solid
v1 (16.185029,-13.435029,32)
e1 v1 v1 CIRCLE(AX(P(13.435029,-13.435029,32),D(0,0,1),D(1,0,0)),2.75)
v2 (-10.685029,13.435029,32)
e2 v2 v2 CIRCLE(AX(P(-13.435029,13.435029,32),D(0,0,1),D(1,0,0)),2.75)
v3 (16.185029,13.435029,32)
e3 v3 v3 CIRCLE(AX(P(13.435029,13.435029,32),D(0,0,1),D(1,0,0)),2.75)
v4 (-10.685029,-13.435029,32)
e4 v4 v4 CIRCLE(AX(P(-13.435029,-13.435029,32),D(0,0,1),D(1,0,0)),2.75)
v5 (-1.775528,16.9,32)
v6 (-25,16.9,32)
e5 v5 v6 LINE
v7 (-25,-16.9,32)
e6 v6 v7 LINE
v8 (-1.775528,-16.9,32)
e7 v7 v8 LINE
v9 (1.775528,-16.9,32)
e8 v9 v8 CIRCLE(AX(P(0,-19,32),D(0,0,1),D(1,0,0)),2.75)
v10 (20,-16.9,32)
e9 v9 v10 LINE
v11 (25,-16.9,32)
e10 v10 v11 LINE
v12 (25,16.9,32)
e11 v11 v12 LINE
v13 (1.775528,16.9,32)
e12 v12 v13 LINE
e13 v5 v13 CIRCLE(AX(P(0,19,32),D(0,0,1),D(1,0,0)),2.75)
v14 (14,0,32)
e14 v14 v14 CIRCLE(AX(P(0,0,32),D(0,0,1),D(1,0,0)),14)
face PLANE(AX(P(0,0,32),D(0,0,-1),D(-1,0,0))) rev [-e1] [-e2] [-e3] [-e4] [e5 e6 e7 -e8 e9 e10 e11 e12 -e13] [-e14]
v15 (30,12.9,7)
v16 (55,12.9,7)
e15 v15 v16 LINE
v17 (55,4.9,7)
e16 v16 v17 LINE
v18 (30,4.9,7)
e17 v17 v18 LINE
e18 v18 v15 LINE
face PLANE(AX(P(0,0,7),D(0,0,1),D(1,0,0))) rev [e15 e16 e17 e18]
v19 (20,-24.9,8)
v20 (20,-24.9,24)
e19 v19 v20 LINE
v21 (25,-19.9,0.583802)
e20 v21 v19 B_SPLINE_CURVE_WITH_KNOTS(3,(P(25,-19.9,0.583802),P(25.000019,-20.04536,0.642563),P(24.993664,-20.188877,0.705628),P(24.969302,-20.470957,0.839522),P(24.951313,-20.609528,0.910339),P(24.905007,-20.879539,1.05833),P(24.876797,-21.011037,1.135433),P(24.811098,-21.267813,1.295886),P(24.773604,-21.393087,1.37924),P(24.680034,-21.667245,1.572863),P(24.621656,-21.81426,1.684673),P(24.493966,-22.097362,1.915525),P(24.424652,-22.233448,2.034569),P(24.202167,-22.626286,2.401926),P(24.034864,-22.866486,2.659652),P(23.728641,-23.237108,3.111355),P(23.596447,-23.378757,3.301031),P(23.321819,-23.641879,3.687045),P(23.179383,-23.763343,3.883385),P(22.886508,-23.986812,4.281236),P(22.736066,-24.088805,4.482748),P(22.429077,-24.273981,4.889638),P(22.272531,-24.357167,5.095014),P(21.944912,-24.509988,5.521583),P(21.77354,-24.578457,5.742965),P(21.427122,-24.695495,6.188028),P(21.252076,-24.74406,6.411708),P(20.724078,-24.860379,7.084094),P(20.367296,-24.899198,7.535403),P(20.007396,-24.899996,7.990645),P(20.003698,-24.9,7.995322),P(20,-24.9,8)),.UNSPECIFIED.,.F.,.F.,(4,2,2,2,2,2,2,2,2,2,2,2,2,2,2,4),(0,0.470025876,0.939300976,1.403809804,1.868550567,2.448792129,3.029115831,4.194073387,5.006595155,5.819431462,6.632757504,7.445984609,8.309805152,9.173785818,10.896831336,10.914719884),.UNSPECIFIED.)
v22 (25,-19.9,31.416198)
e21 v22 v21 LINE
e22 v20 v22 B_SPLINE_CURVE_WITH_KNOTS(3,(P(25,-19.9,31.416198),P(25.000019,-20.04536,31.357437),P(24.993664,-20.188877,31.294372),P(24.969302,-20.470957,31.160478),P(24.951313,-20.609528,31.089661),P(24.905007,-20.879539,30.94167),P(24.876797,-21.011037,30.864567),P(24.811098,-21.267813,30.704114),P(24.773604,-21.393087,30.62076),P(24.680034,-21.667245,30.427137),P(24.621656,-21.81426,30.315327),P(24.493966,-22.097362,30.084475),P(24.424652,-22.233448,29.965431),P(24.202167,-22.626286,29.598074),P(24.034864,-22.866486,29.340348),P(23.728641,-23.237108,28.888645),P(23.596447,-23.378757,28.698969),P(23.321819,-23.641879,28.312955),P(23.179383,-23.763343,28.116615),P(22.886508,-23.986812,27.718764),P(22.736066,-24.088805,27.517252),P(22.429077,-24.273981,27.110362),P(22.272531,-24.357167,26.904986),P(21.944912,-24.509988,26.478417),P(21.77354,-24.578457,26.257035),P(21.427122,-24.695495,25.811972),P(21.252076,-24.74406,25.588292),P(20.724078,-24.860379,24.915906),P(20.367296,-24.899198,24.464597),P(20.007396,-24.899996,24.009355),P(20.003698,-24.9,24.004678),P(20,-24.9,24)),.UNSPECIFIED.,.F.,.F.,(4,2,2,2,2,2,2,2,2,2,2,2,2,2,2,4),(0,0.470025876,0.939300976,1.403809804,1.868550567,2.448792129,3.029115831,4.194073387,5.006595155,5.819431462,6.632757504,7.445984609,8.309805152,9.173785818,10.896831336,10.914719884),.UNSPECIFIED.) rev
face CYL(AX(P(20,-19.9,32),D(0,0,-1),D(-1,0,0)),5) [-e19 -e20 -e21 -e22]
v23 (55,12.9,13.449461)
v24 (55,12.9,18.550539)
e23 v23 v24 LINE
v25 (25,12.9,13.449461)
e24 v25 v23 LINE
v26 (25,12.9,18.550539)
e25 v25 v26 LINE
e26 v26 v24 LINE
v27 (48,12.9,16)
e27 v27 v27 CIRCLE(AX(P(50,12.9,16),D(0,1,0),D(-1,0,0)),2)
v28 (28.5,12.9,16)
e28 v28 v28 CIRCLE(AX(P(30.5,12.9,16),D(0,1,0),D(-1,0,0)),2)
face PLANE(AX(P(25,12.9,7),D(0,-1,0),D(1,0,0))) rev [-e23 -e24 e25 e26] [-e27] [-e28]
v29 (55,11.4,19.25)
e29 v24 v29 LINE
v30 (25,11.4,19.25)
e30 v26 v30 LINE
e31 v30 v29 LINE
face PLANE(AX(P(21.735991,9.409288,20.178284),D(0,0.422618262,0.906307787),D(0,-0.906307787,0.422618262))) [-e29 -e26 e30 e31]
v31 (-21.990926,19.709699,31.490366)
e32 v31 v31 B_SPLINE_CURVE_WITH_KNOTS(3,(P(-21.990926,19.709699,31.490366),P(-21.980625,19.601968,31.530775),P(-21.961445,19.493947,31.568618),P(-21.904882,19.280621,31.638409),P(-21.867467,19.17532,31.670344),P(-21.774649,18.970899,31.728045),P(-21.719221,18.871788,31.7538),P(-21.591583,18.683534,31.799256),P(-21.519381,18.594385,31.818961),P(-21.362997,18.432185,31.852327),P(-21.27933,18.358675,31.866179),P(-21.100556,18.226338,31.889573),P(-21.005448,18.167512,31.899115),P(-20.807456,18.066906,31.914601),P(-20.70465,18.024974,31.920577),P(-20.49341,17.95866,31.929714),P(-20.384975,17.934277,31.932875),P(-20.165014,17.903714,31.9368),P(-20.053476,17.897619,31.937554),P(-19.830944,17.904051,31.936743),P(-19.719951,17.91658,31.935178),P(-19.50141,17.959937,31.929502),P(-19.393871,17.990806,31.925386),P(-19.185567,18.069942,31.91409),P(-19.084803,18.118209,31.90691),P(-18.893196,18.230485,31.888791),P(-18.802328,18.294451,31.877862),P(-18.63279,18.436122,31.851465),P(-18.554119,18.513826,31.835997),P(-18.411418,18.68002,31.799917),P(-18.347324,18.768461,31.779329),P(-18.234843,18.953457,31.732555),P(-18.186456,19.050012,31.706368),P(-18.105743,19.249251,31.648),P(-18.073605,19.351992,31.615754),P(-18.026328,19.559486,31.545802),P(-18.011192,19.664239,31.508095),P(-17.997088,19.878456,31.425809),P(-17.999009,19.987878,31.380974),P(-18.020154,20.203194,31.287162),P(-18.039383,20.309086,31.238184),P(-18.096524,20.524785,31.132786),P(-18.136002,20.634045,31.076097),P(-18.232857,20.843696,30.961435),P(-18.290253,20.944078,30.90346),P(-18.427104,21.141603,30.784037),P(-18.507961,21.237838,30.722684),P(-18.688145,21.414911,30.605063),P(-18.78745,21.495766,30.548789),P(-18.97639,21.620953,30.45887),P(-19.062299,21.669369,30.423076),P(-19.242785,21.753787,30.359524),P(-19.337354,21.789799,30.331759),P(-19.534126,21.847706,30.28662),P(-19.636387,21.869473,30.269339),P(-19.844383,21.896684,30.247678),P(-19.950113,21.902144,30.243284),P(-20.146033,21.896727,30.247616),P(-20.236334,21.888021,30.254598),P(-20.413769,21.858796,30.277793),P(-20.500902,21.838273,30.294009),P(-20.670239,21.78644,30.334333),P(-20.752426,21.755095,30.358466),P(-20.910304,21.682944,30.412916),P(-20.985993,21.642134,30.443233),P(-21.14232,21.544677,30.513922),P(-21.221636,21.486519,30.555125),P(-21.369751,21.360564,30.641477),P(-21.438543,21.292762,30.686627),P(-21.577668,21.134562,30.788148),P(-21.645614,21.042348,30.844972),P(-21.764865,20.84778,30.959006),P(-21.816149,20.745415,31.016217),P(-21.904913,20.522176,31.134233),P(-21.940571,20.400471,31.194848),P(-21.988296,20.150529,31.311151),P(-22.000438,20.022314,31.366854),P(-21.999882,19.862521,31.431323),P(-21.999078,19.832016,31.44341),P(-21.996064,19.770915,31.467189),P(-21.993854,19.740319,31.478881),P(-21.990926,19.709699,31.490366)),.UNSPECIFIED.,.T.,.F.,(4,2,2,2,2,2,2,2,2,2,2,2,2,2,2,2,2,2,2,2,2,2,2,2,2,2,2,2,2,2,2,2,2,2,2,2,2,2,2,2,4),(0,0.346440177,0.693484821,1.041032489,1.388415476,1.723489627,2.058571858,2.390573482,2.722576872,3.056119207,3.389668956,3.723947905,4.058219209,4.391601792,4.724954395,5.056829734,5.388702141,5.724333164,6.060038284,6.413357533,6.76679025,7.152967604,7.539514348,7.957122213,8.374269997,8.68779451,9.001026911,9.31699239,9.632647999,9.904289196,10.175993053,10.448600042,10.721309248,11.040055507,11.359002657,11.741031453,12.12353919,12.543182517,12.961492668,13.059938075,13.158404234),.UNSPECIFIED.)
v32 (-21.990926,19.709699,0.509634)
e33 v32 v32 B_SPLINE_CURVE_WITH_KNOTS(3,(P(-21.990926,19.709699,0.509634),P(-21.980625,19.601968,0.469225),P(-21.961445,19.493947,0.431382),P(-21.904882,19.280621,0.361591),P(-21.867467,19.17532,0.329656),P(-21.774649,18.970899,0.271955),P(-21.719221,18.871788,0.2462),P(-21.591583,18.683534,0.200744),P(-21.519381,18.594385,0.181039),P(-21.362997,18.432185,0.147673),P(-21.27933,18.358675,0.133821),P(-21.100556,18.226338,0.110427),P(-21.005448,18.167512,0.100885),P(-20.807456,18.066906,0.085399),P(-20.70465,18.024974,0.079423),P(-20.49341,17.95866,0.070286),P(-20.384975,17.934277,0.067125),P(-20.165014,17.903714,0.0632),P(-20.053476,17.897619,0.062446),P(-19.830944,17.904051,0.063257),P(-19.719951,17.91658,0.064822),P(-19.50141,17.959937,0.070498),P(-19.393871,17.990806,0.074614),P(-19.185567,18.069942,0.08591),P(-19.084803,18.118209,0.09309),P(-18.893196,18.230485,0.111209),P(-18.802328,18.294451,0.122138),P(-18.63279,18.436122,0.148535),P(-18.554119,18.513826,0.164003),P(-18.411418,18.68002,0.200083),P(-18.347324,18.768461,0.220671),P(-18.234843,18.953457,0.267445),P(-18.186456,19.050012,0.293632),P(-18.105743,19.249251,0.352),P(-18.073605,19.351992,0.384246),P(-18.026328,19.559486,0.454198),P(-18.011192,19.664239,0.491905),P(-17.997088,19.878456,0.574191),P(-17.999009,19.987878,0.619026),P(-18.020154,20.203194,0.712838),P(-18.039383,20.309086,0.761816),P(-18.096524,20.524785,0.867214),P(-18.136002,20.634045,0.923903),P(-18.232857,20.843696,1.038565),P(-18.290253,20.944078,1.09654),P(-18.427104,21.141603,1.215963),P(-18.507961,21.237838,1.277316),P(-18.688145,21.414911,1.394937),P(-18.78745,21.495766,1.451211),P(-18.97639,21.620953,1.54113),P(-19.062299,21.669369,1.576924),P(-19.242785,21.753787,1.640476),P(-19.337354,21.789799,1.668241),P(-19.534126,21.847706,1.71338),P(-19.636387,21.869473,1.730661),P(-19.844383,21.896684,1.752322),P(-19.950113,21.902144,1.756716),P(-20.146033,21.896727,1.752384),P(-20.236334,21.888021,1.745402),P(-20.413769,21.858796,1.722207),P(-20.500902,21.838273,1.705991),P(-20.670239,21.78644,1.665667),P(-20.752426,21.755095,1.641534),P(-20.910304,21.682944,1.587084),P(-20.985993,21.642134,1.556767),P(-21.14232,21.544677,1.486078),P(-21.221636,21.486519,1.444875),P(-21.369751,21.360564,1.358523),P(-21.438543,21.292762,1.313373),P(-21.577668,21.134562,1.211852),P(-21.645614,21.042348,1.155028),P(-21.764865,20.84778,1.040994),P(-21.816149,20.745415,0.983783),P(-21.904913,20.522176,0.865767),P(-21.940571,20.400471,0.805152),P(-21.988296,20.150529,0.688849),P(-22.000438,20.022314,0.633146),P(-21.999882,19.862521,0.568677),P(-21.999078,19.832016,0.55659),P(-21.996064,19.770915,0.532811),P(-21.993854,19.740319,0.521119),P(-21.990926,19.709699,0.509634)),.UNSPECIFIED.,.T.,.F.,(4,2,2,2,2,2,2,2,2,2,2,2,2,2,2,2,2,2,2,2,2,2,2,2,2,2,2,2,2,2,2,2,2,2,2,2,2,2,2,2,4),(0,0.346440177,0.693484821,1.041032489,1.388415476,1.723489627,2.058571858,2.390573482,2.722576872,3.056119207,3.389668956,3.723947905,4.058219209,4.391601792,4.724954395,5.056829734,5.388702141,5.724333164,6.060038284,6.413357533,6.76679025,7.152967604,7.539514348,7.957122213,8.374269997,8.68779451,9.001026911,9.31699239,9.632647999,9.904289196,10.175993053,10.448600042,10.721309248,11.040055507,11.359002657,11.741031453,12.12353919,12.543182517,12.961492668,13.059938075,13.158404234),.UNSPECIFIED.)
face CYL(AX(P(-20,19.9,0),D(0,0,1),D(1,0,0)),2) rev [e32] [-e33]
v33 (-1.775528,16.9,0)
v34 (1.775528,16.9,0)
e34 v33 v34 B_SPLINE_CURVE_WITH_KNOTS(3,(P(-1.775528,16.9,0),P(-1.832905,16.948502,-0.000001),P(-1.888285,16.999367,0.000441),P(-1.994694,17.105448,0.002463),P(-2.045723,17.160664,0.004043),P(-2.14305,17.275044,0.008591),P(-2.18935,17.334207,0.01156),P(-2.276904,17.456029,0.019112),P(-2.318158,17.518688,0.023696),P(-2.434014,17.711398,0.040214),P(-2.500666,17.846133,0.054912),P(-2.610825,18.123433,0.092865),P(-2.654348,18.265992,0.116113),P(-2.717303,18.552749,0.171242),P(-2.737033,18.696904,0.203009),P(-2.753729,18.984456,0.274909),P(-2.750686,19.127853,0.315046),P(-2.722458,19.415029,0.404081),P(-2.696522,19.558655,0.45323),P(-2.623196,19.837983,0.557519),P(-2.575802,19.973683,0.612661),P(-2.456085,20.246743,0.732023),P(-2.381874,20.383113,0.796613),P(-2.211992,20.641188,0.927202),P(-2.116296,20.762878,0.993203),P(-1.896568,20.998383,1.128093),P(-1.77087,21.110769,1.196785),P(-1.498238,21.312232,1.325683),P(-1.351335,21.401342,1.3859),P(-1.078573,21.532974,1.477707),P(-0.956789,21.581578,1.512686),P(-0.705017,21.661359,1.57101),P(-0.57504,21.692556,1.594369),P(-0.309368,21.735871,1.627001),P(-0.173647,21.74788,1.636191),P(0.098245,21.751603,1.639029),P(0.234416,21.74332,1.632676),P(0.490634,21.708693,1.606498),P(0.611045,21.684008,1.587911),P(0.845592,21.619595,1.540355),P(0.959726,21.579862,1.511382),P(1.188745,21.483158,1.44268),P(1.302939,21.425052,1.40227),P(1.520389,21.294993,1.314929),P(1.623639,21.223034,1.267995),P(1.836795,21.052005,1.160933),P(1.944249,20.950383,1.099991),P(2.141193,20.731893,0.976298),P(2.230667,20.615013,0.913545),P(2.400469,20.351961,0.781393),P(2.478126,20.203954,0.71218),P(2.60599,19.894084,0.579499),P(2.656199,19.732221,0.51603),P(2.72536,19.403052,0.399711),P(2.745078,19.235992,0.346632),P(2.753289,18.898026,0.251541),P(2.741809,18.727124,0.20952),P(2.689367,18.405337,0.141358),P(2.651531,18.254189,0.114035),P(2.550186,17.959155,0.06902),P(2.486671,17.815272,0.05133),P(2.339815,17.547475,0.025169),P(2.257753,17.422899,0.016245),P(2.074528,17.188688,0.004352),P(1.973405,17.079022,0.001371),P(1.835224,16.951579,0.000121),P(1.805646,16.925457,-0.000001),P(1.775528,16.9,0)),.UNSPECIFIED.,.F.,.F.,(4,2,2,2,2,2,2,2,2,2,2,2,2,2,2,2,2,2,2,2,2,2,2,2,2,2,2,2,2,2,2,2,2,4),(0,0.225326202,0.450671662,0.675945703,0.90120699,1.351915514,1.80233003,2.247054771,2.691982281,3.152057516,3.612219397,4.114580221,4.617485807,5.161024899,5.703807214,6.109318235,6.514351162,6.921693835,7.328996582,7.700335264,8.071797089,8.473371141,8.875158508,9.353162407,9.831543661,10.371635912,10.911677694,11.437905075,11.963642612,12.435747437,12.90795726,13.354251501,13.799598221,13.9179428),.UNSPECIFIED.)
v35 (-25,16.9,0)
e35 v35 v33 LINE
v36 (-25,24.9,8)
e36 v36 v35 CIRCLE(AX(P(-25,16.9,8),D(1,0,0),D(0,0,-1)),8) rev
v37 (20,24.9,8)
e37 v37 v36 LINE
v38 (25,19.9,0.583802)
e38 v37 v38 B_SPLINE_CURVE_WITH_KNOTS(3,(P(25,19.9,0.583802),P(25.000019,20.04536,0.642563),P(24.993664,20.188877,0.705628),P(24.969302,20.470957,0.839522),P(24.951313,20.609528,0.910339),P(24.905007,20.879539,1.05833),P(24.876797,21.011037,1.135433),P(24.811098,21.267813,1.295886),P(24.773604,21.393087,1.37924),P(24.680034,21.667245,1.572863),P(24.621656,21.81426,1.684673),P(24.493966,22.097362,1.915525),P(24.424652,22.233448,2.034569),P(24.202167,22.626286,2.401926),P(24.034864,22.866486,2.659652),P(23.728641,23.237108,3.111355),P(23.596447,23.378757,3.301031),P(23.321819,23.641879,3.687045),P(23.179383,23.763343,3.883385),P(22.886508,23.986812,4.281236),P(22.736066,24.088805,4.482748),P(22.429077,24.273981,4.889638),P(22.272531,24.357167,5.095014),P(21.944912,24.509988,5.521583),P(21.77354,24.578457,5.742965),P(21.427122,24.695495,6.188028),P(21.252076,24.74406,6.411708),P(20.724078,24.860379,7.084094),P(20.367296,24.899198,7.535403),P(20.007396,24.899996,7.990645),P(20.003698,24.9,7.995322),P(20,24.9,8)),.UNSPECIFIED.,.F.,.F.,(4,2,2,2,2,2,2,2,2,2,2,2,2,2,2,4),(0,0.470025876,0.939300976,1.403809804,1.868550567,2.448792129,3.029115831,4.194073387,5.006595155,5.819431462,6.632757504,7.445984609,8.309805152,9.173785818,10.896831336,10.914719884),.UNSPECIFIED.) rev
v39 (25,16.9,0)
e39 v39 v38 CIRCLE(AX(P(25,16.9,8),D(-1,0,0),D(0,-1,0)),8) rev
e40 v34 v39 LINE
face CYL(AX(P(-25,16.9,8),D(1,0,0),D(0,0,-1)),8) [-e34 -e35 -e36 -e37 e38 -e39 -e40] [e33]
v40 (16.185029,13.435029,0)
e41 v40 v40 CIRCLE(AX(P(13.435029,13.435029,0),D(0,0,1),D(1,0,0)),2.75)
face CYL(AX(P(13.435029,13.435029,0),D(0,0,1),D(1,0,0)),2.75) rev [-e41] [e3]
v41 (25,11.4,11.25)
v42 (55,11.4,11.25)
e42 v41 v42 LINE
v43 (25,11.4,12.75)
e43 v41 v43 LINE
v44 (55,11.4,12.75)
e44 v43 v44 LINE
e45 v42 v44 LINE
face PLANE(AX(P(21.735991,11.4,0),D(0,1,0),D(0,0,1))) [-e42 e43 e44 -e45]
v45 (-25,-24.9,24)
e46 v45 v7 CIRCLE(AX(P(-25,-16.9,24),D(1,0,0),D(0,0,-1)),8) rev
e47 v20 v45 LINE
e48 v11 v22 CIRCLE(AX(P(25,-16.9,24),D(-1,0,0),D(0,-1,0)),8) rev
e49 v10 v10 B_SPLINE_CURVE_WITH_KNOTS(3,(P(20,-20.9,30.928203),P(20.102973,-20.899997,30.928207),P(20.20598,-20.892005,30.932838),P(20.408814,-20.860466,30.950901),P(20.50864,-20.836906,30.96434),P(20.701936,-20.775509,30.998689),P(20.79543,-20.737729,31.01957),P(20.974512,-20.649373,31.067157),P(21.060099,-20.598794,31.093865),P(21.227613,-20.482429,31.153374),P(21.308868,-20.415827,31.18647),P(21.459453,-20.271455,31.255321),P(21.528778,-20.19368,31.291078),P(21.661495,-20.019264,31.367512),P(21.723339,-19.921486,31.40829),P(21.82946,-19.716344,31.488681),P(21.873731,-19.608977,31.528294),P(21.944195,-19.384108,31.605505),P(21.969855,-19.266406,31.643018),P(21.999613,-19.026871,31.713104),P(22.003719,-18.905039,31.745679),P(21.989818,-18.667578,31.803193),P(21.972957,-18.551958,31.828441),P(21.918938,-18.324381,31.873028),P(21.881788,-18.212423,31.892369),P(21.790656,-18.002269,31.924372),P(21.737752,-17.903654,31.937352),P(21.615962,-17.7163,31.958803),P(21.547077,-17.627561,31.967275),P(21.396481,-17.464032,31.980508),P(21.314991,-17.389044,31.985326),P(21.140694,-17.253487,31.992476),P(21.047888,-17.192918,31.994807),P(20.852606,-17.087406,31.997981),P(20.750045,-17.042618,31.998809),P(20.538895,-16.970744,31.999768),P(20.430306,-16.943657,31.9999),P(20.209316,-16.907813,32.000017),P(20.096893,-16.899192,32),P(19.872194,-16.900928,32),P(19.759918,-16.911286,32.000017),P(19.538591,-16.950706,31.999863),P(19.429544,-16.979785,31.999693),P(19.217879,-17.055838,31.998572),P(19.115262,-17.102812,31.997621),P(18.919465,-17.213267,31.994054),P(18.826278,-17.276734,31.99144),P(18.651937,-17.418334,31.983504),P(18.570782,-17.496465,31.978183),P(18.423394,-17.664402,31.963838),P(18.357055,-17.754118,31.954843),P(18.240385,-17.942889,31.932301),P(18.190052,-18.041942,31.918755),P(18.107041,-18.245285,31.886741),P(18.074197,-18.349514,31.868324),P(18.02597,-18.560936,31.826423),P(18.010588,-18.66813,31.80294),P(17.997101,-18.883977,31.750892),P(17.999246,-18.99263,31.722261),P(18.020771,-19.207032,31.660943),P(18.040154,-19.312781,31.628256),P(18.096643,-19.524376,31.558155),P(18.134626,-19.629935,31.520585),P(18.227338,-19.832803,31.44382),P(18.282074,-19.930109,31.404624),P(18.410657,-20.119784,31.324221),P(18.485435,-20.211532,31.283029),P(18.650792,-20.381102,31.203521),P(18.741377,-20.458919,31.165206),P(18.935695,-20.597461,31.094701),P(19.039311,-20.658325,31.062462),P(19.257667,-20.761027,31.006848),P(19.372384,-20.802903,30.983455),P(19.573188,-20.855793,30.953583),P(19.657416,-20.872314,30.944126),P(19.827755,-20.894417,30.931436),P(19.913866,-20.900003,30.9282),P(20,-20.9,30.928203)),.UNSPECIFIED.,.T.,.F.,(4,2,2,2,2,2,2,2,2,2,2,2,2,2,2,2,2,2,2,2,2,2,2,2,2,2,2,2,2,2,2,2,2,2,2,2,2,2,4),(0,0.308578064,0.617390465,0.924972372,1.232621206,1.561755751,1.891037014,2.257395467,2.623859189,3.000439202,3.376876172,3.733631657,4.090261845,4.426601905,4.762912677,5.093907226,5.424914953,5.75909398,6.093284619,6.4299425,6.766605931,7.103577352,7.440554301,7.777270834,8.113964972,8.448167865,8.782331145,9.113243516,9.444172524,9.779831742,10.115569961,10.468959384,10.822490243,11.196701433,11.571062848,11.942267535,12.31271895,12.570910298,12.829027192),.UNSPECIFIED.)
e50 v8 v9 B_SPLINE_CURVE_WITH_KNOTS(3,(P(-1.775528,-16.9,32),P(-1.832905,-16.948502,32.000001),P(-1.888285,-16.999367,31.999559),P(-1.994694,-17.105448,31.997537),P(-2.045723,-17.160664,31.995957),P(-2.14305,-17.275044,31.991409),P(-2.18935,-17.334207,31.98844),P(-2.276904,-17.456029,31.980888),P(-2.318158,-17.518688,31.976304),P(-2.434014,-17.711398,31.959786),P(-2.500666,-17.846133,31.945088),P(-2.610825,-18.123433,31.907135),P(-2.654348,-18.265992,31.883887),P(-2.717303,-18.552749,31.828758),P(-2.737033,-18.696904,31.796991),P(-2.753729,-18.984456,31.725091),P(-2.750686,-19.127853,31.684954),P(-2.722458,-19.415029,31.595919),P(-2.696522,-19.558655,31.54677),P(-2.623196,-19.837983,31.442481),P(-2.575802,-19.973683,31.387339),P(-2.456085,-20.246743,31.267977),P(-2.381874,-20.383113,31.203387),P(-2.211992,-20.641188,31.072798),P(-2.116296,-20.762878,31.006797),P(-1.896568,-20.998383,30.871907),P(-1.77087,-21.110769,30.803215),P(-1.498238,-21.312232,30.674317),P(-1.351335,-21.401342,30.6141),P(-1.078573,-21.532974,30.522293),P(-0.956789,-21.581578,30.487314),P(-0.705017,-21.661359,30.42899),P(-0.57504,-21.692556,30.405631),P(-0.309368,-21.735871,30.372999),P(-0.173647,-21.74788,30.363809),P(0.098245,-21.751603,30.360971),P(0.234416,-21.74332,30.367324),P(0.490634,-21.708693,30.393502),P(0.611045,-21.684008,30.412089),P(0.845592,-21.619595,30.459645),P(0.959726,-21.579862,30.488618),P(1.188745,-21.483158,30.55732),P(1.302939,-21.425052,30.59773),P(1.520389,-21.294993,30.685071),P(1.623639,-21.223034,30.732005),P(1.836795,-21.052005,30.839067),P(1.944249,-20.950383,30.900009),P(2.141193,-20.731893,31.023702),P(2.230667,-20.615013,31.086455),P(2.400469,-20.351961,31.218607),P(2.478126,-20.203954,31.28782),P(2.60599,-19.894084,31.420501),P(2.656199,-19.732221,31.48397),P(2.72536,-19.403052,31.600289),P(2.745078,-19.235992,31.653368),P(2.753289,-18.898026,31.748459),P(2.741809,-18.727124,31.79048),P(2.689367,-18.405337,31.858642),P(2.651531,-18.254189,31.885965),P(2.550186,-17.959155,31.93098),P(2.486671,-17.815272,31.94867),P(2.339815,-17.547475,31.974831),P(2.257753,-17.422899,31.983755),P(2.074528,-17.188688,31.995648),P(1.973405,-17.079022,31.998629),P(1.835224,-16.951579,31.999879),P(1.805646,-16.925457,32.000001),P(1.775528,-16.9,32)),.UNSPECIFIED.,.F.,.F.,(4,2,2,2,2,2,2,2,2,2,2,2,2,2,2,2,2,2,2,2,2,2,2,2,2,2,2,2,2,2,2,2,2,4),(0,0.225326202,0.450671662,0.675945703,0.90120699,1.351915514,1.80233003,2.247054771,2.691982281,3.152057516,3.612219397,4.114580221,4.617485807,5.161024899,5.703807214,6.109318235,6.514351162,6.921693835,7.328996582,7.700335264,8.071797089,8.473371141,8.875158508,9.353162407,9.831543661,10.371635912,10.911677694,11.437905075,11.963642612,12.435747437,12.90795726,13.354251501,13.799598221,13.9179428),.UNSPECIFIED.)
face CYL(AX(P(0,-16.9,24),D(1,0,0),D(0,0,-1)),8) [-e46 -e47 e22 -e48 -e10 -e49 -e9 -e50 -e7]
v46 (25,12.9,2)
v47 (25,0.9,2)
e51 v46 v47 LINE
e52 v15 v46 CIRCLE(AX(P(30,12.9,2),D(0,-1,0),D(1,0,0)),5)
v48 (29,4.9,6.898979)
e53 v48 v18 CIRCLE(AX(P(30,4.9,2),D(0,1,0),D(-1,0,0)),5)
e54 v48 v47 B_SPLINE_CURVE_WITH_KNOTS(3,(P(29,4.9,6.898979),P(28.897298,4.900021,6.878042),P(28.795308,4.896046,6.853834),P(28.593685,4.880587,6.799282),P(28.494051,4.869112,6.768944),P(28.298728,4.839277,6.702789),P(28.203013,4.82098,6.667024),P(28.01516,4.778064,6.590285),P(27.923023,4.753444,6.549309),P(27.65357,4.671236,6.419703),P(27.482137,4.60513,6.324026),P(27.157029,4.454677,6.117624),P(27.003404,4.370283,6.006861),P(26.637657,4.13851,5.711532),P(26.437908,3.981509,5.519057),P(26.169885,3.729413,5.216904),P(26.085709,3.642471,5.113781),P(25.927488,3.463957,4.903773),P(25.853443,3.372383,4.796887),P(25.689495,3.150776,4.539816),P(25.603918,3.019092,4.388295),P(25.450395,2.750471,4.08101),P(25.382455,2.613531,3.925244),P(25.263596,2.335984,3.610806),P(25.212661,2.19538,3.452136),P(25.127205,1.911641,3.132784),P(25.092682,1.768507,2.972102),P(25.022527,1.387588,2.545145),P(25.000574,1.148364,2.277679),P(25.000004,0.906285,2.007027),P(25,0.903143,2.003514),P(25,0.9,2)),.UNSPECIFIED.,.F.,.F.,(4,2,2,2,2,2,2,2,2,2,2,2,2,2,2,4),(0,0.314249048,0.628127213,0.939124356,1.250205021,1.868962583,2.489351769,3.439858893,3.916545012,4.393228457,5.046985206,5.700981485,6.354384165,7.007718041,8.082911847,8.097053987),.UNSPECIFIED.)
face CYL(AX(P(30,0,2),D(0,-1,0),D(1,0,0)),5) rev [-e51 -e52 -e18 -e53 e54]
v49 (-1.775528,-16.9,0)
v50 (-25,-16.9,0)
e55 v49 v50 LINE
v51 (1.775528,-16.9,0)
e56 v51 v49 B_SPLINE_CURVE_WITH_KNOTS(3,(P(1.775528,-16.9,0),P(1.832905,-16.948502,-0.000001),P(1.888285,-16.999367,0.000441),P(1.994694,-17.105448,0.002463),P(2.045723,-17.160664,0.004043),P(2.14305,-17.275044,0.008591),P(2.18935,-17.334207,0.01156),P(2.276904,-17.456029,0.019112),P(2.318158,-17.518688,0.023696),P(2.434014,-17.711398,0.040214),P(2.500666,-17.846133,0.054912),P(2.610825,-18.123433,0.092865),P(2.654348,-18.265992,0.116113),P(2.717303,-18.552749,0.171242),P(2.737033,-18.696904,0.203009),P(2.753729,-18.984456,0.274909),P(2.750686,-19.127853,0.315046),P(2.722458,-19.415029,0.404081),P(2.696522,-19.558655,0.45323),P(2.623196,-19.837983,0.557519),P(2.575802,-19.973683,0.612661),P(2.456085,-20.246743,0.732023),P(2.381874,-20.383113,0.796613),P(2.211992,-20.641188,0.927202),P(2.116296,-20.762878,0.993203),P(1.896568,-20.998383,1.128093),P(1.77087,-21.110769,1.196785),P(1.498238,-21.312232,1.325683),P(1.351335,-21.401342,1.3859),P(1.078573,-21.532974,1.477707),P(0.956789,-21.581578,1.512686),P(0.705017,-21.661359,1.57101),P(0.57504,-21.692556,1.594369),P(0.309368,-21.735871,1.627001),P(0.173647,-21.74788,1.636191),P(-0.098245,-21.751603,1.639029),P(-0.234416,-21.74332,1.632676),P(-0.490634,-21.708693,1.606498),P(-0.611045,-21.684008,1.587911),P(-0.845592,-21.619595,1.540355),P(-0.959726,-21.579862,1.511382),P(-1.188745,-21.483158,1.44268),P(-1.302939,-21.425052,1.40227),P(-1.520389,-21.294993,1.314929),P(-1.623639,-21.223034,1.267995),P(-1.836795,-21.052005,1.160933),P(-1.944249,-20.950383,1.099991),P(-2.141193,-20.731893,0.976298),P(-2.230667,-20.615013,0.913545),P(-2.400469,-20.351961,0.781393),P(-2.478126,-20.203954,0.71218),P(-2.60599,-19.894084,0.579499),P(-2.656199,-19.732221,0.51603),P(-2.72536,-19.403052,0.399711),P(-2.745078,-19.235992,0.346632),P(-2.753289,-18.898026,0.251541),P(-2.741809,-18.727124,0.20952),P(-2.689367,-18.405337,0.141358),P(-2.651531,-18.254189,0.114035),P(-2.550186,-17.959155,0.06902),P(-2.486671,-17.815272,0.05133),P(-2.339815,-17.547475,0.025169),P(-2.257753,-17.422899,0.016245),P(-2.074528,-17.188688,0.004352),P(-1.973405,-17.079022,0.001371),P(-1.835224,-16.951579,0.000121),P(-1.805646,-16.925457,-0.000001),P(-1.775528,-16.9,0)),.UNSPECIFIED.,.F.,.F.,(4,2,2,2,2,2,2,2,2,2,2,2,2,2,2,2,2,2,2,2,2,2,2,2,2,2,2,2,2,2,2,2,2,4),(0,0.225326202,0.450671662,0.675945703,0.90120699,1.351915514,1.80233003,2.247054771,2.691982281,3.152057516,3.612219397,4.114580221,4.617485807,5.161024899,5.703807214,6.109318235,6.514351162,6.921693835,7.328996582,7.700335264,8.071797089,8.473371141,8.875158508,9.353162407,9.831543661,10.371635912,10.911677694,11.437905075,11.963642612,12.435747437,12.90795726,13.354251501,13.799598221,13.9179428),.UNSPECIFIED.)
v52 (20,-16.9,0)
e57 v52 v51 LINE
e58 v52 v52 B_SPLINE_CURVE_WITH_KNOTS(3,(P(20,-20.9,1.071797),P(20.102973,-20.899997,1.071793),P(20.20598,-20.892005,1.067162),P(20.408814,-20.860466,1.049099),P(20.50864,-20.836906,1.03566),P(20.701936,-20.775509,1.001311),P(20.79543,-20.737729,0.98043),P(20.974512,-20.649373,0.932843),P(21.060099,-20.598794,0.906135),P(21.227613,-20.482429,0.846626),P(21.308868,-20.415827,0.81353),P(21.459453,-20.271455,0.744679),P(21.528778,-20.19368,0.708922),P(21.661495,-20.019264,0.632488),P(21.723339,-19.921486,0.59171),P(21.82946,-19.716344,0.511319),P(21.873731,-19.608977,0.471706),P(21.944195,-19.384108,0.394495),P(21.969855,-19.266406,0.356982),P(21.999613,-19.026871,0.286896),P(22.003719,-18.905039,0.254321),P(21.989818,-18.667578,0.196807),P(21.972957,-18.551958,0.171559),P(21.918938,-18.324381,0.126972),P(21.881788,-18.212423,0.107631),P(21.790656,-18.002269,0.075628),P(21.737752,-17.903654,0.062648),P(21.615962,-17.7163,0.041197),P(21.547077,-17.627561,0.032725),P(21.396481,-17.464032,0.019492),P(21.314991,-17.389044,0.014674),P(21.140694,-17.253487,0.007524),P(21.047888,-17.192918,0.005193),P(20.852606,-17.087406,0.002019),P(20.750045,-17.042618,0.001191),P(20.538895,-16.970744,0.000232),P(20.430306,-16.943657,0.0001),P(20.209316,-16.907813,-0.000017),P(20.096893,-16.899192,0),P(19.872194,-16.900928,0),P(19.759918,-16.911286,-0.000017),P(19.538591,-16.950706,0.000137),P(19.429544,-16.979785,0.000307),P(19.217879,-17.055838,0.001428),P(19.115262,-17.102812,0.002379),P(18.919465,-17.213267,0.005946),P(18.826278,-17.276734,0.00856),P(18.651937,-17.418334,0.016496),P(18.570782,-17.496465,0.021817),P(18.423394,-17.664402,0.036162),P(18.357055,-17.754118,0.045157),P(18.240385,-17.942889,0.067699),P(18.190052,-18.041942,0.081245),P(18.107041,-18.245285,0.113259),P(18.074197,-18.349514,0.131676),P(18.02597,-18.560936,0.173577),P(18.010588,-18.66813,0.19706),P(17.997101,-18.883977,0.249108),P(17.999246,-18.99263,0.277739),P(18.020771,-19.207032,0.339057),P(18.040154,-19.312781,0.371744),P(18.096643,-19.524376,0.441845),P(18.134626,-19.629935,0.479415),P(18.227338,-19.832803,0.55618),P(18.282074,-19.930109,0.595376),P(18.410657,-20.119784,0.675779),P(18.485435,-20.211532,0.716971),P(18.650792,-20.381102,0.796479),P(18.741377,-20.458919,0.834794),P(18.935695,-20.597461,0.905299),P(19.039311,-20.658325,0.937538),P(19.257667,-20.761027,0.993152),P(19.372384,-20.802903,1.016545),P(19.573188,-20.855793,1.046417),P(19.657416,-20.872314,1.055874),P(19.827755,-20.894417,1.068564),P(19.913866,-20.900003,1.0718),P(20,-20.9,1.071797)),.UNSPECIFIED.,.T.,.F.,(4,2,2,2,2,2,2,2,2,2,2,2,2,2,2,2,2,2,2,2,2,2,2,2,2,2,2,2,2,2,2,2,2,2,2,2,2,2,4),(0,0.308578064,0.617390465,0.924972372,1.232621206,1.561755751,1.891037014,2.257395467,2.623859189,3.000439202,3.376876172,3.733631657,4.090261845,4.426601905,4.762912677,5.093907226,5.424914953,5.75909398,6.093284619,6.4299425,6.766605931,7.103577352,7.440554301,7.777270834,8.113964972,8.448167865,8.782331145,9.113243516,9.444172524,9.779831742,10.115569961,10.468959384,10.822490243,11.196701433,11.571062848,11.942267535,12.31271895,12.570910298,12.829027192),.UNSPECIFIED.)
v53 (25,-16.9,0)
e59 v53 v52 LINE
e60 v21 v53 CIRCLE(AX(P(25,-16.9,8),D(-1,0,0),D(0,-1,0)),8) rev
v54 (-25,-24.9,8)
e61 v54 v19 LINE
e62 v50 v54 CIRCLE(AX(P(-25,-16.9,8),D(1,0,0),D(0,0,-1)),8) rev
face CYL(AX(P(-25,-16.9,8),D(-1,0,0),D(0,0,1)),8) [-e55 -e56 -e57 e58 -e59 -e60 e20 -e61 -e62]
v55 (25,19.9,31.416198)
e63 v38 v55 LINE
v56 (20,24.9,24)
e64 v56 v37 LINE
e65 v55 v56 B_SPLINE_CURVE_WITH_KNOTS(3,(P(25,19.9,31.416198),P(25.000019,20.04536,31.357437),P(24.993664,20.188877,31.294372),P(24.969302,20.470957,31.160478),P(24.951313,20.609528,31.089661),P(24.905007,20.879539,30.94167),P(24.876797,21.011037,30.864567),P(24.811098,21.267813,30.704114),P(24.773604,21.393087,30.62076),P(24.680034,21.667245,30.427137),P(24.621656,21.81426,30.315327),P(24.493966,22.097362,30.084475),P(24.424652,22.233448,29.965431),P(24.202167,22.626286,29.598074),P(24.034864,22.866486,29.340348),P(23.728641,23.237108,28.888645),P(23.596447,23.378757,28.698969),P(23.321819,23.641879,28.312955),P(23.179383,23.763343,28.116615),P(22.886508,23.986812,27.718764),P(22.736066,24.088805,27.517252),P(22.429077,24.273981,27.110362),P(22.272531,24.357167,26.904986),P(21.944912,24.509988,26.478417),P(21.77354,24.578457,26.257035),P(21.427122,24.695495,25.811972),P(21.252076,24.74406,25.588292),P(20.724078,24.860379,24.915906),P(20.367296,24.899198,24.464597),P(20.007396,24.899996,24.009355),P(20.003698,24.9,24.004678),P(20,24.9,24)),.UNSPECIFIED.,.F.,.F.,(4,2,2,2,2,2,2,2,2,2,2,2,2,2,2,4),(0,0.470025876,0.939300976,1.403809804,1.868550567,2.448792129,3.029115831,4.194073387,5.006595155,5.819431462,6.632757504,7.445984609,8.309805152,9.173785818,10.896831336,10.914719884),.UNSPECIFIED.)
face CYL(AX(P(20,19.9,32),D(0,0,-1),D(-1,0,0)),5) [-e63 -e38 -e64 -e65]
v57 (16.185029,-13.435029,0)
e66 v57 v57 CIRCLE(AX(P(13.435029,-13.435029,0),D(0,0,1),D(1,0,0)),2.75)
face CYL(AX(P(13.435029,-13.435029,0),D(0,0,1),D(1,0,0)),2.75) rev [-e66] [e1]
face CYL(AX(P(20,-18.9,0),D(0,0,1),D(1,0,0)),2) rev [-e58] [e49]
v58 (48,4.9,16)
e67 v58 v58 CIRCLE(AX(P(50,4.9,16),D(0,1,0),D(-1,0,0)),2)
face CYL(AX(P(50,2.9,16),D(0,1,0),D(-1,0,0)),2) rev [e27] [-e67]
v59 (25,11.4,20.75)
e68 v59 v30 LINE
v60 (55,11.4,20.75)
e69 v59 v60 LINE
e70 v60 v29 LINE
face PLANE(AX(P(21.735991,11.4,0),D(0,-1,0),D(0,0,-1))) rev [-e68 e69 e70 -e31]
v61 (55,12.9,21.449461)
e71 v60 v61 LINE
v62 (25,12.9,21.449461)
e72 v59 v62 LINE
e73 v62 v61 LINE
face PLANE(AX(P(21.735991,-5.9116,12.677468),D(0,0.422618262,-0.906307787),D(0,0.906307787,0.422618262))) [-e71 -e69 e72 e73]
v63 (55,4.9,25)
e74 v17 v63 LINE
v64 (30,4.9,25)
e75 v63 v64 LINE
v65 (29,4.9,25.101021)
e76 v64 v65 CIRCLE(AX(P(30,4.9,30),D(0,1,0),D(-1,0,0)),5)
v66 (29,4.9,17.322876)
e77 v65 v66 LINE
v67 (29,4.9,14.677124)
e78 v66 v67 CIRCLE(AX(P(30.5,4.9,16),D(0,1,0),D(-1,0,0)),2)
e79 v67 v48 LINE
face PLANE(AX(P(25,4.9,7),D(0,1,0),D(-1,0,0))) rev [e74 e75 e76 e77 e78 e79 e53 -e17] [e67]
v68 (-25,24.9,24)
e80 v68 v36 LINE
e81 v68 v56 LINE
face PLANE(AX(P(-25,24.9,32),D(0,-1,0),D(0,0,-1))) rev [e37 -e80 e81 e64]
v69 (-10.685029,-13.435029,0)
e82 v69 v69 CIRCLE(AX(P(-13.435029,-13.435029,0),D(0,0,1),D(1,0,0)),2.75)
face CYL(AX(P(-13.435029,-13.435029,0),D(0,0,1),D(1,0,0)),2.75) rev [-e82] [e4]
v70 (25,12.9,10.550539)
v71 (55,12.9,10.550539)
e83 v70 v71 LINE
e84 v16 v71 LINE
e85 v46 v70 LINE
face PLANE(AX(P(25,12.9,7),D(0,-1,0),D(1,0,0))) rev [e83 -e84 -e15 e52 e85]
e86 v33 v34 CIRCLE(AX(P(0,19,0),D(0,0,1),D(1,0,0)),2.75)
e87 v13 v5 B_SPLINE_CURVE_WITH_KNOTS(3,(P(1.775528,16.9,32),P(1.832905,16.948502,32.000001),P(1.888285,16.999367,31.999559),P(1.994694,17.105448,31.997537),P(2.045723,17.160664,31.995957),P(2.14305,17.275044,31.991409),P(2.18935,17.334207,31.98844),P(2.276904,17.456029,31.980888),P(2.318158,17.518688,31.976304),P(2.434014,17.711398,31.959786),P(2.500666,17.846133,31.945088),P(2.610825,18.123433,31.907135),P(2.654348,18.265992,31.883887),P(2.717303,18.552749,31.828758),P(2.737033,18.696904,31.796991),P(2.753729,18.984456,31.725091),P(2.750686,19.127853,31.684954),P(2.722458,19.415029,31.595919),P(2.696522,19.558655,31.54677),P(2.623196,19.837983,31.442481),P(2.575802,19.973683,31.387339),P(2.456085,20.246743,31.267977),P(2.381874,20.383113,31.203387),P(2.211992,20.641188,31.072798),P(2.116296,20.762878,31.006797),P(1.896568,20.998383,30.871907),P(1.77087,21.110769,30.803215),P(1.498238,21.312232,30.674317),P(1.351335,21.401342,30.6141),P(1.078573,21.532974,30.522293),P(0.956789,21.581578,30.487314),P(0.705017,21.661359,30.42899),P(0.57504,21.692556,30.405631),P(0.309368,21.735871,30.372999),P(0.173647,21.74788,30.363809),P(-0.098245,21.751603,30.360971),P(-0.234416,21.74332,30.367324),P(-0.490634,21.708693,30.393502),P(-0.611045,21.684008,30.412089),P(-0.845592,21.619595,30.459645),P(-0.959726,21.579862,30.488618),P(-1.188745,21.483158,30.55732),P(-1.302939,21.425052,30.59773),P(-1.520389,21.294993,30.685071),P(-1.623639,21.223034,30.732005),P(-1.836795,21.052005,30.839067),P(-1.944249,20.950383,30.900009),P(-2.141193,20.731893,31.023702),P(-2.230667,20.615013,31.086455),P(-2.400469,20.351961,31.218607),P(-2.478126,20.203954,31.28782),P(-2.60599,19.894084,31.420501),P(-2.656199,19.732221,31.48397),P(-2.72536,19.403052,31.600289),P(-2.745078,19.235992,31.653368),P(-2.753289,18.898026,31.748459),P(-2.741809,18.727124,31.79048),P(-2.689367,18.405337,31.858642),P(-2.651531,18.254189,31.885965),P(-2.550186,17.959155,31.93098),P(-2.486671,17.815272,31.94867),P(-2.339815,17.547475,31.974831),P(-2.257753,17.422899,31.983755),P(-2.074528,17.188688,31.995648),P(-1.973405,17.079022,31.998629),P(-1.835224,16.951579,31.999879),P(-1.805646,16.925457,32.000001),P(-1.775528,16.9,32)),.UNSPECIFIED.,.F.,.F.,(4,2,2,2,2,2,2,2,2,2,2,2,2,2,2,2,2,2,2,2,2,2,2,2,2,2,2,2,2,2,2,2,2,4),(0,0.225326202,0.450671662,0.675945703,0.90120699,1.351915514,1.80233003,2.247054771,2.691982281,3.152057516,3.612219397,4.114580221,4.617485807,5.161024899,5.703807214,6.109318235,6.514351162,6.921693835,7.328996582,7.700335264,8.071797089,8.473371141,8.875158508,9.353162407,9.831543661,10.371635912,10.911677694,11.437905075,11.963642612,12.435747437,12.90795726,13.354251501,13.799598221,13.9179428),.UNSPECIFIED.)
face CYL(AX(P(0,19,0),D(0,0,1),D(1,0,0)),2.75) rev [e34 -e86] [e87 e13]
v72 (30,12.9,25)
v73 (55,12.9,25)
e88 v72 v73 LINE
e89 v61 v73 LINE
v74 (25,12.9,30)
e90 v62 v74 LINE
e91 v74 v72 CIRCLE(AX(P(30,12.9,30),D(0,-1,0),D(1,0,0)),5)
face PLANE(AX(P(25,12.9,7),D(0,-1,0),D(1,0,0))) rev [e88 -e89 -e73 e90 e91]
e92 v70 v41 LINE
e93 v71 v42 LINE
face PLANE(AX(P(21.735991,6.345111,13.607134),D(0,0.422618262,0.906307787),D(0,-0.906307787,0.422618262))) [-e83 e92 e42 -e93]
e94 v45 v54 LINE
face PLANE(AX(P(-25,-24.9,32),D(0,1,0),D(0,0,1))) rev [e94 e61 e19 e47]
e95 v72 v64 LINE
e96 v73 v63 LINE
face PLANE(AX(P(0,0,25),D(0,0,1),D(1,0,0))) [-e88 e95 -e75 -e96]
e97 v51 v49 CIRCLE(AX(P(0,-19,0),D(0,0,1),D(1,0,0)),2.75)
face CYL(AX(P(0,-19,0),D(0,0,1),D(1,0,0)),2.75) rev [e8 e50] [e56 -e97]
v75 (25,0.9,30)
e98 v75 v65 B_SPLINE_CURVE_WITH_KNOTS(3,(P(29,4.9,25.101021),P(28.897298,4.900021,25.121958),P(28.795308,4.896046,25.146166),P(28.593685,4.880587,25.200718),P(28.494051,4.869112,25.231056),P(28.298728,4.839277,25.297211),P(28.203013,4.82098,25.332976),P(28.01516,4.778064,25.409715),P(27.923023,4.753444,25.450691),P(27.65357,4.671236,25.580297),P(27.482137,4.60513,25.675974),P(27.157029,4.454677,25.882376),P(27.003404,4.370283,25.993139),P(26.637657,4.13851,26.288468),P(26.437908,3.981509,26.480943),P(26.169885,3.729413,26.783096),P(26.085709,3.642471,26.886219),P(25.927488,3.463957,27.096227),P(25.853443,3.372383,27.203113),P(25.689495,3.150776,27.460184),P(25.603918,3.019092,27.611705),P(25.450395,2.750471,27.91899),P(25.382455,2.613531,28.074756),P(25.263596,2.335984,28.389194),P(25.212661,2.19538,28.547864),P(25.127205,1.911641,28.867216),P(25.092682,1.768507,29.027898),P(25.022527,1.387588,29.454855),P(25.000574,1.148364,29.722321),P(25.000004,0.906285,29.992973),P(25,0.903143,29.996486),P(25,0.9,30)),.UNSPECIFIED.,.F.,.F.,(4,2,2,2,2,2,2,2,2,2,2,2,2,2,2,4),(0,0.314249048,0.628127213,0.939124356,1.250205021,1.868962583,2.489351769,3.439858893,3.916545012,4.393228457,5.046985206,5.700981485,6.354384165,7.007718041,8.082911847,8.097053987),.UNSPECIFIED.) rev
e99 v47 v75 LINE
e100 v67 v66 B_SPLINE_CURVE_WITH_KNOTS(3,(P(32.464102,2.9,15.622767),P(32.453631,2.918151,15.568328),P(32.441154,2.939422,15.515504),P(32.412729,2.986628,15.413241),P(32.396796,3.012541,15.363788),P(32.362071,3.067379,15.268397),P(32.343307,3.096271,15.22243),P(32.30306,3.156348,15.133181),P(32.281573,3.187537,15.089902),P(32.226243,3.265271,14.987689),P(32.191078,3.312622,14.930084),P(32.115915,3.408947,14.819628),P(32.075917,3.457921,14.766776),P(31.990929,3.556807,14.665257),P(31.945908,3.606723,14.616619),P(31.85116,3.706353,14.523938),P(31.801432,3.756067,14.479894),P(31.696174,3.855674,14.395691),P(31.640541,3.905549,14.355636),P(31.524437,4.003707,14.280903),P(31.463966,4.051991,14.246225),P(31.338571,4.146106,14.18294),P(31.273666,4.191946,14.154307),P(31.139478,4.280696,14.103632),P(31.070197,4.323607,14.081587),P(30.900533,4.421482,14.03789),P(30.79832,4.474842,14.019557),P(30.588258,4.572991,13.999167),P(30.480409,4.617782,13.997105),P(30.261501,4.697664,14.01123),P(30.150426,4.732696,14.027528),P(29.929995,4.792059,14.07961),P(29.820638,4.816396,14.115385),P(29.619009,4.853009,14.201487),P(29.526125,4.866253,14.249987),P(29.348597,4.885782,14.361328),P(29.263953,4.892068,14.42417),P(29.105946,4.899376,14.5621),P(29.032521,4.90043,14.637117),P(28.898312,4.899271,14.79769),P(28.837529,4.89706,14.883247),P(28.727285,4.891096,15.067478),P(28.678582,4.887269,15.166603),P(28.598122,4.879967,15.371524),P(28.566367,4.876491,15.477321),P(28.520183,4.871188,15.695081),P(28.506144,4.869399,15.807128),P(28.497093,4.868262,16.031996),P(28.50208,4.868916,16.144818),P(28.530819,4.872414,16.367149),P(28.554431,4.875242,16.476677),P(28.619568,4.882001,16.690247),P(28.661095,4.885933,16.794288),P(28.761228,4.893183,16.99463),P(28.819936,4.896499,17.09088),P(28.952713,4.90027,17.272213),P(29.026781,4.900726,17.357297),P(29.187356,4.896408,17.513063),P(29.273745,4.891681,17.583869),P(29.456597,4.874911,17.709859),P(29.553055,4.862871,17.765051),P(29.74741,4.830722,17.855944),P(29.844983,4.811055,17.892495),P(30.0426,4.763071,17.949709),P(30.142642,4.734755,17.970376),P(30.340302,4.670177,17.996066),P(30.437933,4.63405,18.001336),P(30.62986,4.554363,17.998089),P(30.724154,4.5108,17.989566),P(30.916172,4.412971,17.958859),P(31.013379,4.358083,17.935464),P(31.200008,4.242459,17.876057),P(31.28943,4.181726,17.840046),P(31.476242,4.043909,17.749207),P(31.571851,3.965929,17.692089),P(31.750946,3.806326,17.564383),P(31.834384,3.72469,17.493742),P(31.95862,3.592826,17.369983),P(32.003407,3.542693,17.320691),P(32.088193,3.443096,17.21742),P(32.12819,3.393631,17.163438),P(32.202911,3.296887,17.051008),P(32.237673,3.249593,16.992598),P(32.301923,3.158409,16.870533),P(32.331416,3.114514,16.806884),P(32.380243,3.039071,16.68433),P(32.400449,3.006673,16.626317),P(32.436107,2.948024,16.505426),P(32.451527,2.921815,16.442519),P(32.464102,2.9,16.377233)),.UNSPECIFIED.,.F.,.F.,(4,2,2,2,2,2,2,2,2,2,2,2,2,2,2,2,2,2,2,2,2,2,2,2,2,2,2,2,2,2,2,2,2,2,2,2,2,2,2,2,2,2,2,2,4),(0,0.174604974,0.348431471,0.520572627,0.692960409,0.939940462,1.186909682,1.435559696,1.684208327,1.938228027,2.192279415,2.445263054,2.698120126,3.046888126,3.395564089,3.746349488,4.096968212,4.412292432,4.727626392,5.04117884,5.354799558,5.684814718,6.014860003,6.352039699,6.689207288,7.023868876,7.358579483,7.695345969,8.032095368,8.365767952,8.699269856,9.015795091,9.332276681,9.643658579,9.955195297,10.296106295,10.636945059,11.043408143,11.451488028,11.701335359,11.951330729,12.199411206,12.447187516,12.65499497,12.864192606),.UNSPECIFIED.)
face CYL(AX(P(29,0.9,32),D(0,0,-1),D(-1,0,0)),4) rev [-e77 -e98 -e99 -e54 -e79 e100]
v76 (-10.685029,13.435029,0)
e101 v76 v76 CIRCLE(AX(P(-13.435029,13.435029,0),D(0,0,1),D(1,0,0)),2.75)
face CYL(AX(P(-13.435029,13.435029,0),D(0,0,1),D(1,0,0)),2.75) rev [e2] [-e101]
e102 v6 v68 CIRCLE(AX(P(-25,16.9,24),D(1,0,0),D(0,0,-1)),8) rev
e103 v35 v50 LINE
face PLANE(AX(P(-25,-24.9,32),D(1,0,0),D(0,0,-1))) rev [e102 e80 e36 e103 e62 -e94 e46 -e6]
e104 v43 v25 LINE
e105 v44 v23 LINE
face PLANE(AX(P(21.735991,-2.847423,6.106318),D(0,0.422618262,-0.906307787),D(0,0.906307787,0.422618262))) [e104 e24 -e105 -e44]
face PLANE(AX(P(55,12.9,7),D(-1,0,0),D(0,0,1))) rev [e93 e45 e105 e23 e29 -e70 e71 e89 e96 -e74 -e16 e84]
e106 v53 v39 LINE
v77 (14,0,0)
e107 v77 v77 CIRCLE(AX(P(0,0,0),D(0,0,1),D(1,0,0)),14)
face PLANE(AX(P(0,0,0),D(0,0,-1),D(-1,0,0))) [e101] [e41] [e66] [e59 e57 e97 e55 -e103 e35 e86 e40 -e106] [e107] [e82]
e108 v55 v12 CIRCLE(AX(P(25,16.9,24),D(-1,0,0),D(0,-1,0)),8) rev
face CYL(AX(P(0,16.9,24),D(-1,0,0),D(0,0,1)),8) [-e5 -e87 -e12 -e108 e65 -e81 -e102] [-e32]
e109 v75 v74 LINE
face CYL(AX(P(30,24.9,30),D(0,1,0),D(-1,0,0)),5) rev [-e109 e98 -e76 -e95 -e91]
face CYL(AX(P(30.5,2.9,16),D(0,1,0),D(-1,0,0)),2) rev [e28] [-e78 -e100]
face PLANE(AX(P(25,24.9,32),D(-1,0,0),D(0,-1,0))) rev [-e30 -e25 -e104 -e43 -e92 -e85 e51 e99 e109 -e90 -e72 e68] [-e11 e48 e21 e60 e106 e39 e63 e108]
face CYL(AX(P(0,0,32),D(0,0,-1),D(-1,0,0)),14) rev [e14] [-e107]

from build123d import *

# Parameters (mm, degrees)
SKETCH1_W           = 50
SKETCH1_H           = 49.8
SKETCH1_R           = 14
BOSS_EXTRUDE1_DEPTH = 32
SKETCH5_R           = 2
CUT_EXTRUDE2_DEPTH  = 48.634126422
SKETCH12_W          = 30
SKETCH12_H          = 8
BOSS_EXTRUDE3_DEPTH = 18
CUT_EXTRUDE3_DEPTH  = 30
FILLET5_R           = 5
FILLET6_R           = 5
FILLET8_R           = 4
SKETCH14_R          = 2
CUT_EXTRUDE4_DEPTH  = 10
SKETCH16_R          = 2.75
CUT_EXTRUDE5_DEPTH  = 69.330154398
FILLET10_R          = 8
FILLET11_R          = 5


with BuildPart() as part:
    # Sketch1 → Boss-Extrude1 (new body)
    with BuildSketch(Plane.XY):
        Rectangle(SKETCH1_W, SKETCH1_H)
        Circle(SKETCH1_R, mode=Mode.SUBTRACT)
    extrude(amount=BOSS_EXTRUDE1_DEPTH)

    # Sketch5 → Cut-Extrude2 (cut, through all)
    with BuildSketch(Plane.XY.offset(32)):
        with Locations((20, -18.9)):
            Circle(SKETCH5_R)
        with Locations((-20, 19.9)):
            Circle(SKETCH5_R)
    extrude(amount=-CUT_EXTRUDE2_DEPTH, mode=Mode.SUBTRACT)

    # Sketch12 → Boss-Extrude3 (add)
    with BuildSketch(Plane(origin=(0, 0, 25), x_dir=(-1, 0, 0), z_dir=(0, 0, -1))):
        with Locations((-40, 8.9)):
            Rectangle(SKETCH12_W, SKETCH12_H)
    extrude(amount=BOSS_EXTRUDE3_DEPTH)

    # Sketch13 → Cut-Extrude3 (cut)
    with BuildSketch(Plane(origin=(55, 0, 0), x_dir=(0, 0, -1), z_dir=(1, 0, 0))):
        Polygon((-18.550538513, 12.9), (-21.449461487, 12.9), (-20.75, 11.4), (-19.25, 11.4), align=None)
        Polygon((-10.550538513, 12.9), (-13.449461487, 12.9), (-12.75, 11.4), (-11.25, 11.4), align=None)
    extrude(amount=-CUT_EXTRUDE3_DEPTH, mode=Mode.SUBTRACT)

    # Fillet5
    fillet5_edges = [part.edges().sort_by_distance(p)[0] for p in [
        (25, 8.9, 25),
    ]]
    fillet(fillet5_edges, radius=FILLET5_R)

    # Fillet6
    fillet6_edges = [part.edges().sort_by_distance(p)[0] for p in [
        (25, 8.9, 7),
    ]]
    fillet(fillet6_edges, radius=FILLET6_R)

    # Fillet8
    fillet8_edges = [part.edges().sort_by_distance(p)[0] for p in [
        (25, 4.9, 16),
    ]]
    fillet(fillet8_edges, radius=FILLET8_R)

    # Sketch14 → Cut-Extrude4 (cut)
    with BuildSketch(Plane(origin=(0, 12.9, 0), x_dir=(1, 0, 0), z_dir=(0, 1, 0))):
        with Locations(Location((50, -16, 0), (0, 0, 180))):
            Circle(SKETCH14_R)
        with Locations(Location((30.5, -16, 0), (0, 0, 180))):
            Circle(SKETCH14_R)
    extrude(amount=-CUT_EXTRUDE4_DEPTH, mode=Mode.SUBTRACT)

    # Sketch16 → Cut-Extrude5 (cut, through all)
    with BuildSketch(Plane.XY.offset(32)):
        with Locations((0, 19)):
            Circle(SKETCH16_R)
        with Locations((13.435028843, 13.435028843)):
            Circle(SKETCH16_R)
        with Locations((13.435028843, -13.435028843)):
            Circle(SKETCH16_R)
        with Locations((0, -19)):
            Circle(SKETCH16_R)
        with Locations((-13.435028843, -13.435028843)):
            Circle(SKETCH16_R)
        with Locations((-13.435028843, 13.435028843)):
            Circle(SKETCH16_R)
    extrude(amount=-CUT_EXTRUDE5_DEPTH, mode=Mode.SUBTRACT)

    # Fillet10
    # the kernel refuses this fillet: 8 mm, written as the material it takes off along each edge
    with BuildSketch(Plane(origin=(45, -24.9, 32), x_dir=(0, 1, 0), z_dir=(-1, 0, 0)), Plane(origin=(45, -24.9, 0), x_dir=(0, 0, 1), z_dir=(-1, 0, 0)), Plane(origin=(-45, 24.9, 0), x_dir=(0, 0, 1), z_dir=(1, 0, 0))) as fillet10_piece_1:
        with BuildLine():
            CenterArc((FILLET10_R, FILLET10_R), FILLET10_R, 180, 90)
            Line((0, FILLET10_R), (0, 0))
            Line((0, 0), (FILLET10_R, 0))
        make_face()
    extrude(amount=90, mode=Mode.SUBTRACT)
    with BuildSketch(Plane(origin=(-45, 24.9, 32), x_dir=(0, 0, -1), z_dir=(1, 0, 0))) as fillet10_piece_2:
        with BuildLine():
            CenterArc((FILLET10_R, -FILLET10_R), FILLET10_R, 90, 90)
            Line((0, -FILLET10_R), (0, 0))
            Line((0, 0), (FILLET10_R, 0))
        make_face()
    extrude(amount=90, mode=Mode.SUBTRACT)

    # Fillet11
    # the kernel refuses this fillet: 5 mm, written as the material it takes off along each edge
    with BuildSketch(Plane(origin=(25, -24.9, -4.5), x_dir=(0, 1, 0), z_dir=(0, 0, 1))) as fillet11_piece_1:
        with BuildLine():
            CenterArc((FILLET11_R, FILLET11_R), FILLET11_R, 180, 90)
            Line((0, FILLET11_R), (0, 0))
            Line((0, 0), (FILLET11_R, 0))
        make_face()
    extrude(amount=41, mode=Mode.SUBTRACT)
    with BuildSketch(Plane(origin=(25, 24.9, -4.5), x_dir=(0, -1, 0), z_dir=(0, 0, 1))) as fillet11_piece_2:
        with BuildLine():
            CenterArc((FILLET11_R, -FILLET11_R), FILLET11_R, 90, 90)
            Line((0, -FILLET11_R), (0, 0))
            Line((0, 0), (FILLET11_R, 0))
        make_face()
    extrude(amount=41, mode=Mode.SUBTRACT)


solid = part.part
